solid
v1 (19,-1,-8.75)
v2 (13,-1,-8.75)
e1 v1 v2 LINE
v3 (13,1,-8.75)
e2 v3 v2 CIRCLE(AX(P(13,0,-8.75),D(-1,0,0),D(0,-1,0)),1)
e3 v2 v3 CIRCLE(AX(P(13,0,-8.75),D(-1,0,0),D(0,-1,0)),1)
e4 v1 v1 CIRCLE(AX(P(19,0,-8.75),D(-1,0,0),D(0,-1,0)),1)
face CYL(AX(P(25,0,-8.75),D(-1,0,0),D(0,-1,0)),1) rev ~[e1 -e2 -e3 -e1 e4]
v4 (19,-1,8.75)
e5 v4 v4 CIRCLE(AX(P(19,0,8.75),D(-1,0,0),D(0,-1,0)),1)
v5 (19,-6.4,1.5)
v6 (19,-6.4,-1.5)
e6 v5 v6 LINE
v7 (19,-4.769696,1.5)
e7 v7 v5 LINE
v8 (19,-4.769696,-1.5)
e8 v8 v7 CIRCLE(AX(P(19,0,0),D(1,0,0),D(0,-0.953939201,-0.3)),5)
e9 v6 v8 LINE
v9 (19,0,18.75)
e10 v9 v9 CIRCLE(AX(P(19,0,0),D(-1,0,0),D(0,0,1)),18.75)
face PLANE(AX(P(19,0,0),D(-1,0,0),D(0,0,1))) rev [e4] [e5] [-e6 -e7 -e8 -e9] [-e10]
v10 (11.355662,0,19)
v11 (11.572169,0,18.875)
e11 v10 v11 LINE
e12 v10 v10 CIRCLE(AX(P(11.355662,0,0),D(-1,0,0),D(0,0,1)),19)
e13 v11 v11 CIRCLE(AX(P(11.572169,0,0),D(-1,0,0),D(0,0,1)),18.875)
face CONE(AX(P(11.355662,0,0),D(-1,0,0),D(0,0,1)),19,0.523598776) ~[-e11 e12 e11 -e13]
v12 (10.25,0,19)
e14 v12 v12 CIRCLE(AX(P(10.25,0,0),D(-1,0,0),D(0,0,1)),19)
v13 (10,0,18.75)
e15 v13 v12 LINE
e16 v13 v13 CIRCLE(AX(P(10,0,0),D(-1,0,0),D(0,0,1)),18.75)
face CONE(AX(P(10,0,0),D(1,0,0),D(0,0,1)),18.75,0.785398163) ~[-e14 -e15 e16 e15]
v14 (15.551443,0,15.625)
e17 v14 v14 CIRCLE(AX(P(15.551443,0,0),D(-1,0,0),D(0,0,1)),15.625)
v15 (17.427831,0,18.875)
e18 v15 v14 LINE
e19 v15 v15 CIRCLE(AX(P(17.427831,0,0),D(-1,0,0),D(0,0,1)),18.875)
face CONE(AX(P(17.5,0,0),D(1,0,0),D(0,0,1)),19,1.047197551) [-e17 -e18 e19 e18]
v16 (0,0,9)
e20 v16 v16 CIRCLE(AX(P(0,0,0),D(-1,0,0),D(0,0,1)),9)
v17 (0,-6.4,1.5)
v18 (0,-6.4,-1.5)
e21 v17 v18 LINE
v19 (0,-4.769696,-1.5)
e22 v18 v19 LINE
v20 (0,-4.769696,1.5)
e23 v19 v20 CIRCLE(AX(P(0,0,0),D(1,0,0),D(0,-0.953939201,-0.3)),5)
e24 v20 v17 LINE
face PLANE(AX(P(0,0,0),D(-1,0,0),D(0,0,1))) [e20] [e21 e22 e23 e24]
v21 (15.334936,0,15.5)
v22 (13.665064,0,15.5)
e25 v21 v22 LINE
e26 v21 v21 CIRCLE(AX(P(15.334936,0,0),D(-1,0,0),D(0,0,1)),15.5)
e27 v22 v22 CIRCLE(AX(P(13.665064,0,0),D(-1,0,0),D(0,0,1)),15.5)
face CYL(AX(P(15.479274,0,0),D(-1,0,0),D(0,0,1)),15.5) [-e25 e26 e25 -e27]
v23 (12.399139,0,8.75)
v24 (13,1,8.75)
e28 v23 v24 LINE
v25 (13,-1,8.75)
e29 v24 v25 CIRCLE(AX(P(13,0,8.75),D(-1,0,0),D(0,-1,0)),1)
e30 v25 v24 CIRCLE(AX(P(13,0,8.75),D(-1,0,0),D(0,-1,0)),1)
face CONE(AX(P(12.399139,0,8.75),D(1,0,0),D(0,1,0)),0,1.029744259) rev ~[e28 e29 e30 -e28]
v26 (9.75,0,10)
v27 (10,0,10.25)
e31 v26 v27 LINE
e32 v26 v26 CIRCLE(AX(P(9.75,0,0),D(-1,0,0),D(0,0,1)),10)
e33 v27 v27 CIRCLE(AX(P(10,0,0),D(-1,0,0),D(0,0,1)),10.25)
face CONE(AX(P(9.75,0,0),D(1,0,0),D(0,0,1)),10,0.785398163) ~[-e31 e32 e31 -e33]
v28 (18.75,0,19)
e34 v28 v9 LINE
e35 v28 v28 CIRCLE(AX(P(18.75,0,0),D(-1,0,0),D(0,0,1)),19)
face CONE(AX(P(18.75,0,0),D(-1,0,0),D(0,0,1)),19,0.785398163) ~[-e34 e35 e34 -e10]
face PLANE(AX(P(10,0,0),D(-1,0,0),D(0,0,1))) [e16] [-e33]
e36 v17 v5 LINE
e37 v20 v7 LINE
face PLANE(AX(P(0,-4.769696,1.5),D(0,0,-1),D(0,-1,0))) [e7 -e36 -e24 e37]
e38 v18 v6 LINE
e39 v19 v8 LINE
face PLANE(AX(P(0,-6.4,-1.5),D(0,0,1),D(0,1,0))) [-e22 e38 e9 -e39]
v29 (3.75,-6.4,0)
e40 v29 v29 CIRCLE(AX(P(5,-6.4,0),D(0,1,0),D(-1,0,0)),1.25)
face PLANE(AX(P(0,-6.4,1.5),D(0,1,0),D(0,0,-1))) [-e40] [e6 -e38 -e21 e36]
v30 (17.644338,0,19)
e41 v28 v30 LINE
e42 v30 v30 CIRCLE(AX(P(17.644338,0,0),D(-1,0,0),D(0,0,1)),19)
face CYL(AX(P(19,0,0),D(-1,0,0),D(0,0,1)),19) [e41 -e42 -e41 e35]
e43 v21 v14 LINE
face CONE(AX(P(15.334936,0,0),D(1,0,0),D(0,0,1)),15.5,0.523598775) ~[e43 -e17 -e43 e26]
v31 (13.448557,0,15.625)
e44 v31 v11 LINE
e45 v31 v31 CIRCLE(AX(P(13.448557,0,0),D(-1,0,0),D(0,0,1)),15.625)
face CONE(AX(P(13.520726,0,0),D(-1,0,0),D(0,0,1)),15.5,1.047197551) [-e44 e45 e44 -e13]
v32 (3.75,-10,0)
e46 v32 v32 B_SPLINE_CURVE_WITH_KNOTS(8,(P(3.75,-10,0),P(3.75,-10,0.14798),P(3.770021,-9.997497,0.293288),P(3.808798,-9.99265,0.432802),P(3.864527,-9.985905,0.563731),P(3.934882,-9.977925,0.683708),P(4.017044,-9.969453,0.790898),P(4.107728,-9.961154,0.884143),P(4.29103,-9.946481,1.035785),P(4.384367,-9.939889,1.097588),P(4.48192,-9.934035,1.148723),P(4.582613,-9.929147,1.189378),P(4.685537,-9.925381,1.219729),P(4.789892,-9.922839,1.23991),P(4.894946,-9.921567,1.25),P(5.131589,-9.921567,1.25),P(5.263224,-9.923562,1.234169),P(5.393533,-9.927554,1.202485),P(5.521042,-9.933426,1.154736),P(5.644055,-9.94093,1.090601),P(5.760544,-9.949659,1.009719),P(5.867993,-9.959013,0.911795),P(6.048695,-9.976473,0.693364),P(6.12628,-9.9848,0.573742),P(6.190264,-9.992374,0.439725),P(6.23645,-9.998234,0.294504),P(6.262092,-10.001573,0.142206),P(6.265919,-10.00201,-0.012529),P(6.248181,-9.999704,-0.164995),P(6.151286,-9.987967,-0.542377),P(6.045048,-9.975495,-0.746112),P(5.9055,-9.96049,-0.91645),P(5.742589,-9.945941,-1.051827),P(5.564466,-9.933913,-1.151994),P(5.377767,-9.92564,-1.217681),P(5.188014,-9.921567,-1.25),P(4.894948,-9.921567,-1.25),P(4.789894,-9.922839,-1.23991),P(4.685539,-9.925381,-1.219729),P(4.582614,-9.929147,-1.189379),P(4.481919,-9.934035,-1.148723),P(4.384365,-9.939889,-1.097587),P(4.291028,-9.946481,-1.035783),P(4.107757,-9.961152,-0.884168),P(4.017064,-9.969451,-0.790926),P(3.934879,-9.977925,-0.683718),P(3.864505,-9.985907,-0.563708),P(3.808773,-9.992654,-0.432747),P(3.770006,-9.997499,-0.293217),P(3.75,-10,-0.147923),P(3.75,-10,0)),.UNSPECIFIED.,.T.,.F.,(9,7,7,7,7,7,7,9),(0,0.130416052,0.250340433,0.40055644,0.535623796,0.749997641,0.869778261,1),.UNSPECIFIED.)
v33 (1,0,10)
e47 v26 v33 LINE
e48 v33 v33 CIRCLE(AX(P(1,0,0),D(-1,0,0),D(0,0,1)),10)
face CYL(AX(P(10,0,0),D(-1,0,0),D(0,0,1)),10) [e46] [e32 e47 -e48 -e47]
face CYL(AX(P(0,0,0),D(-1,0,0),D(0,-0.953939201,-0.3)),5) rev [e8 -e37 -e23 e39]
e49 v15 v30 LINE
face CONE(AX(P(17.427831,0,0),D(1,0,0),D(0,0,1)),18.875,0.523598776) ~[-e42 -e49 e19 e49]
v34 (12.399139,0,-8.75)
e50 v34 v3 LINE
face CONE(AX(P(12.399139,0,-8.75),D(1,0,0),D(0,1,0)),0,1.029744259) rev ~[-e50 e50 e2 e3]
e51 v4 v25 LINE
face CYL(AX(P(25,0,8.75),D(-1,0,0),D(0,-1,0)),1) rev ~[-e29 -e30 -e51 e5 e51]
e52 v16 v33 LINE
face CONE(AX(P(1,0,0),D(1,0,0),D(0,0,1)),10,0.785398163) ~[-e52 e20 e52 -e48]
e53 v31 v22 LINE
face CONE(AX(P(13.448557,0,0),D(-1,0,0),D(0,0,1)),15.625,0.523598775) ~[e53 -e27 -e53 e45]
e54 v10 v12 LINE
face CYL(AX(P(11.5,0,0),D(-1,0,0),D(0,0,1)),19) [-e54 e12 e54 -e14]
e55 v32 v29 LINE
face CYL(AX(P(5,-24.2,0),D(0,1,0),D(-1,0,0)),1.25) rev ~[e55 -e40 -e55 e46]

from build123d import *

# Parameters (mm, degrees)
F3_SIZE   = 1
F6_DEPTH  = 19
F8_D      = 2.5
F8_DEPTH  = 14.2
F8_TIP    = 0.7510757738
F10_D     = 2
F10_DEPTH = 6
F10_TIP   = 0.600860619


# Not quite as in the source:
# - a fillet or chamfer that OpenCascade refuses, or shapes differently, is made with other operations: its cross-section is extruded or revolved along the edge and cut away or added


with BuildPart() as f2:
    # F0 (on Front) → F2 (revolve)
    with BuildSketch(Plane.XZ):
        Polygon((0, 10), (0, 0), (19, 0), (19, 19), (17.5, 19), (15.4792740578, 15.5), (13.5207259422, 15.5), (11.5, 19), (10, 19), (10, 10), align=None)
    revolve(axis=Axis((9.5, 0, 0), (-1, 0, 0)))

    # F3
    f3_edges = [f2.edges().sort_by_distance(p)[0] for p in [
        (0, 0, -10),
    ]]
    chamfer(f3_edges, length=F3_SIZE)

    # F4: chamfer of 0.25 on 10 edges, made by hand

    # F4_s1 → F4_t2 (revolve)
    with BuildSketch(Plane.XZ):
        Polygon((9.75, 10), (10, 10.25), (10, 10), align=None)
    revolve(axis=Axis((10, 0, 0), (-1, 0, 0)))

    # F4_s3 → F4_t4 (revolve)
    with BuildSketch(Plane.XZ):
        Polygon((15.3349364905, 15.5), (15.5514428415, 15.625), (15.4792740578, 15.5), align=None)
    revolve(axis=Axis((15.4792740578, 0, 0), (-1, 0, 0)))

    # F4_s5 → F4_t6 (revolve)
    with BuildSketch(Plane.XZ):
        Polygon((13.4485571585, 15.625), (13.6650635095, 15.5), (13.5207259422, 15.5), align=None)
    revolve(axis=Axis((13.5207259422, 0, 0), (-1, 0, 0)))

    # F4_s7 → F4_t8 (revolve, cut)
    with BuildSketch(Plane.XZ):
        Polygon((11.3556624327, 19), (11.5721687836, 18.875), (11.5, 19), align=None)
    revolve(axis=Axis((11.5, 0, 0), (-1, 0, 0)), mode=Mode.SUBTRACT)

    # F4_s9 → F4_t10 (revolve, cut)
    with BuildSketch(Plane.XZ):
        Polygon((10, 18.75), (10.25, 19), (10, 19), align=None)
    revolve(axis=Axis((10, 0, 0), (-1, 0, 0)), mode=Mode.SUBTRACT)

    # F4_s11 → F4_t12 (revolve, cut)
    with BuildSketch(Plane.XZ):
        Polygon((18.75, 19), (19, 18.75), (19, 19), align=None)
    revolve(axis=Axis((19, 0, 0), (-1, 0, 0)), mode=Mode.SUBTRACT)

    # F4_s13 → F4_t14 (revolve, cut)
    with BuildSketch(Plane.XZ):
        Polygon((17.4278312164, 18.875), (17.6443375673, 19), (17.5, 19), align=None)
    revolve(axis=Axis((17.5, 0, 0), (-1, 0, 0)), mode=Mode.SUBTRACT)

    # F5 (on Right) → F6 (cut, through all)
    with BuildSketch(Plane.YZ):
        with BuildLine():
            Line((-6.4, -1.5), (-4.7696960071, -1.5))
            ThreePointArc((-4.7696960071, -1.5), (5, 0), (-4.7696960071, 1.5))
            Line((-4.7696960071, 1.5), (-6.4, 1.5))
            Line((-6.4, 1.5), (-6.4, -1.5))
        make_face()
    extrude(amount=F6_DEPTH, mode=Mode.SUBTRACT)

    # F8
    with Locations(Plane.XZ.offset(10)):
        with Locations((5, 0)):
            Hole(F8_D / 2, depth=F8_DEPTH)
            with Locations((0, 0, -(F8_DEPTH + F8_TIP / 2))):  # 118° drill point
                Cone(0, F8_D / 2, F8_TIP, mode=Mode.SUBTRACT)

    # F10
    with Locations(Plane.YZ.offset(19)):
        with Locations((0, 8.75), (0, -8.75)):
            Hole(F10_D / 2, depth=F10_DEPTH)
            with Locations((0, 0, -(F10_DEPTH + F10_TIP / 2))):  # 118° drill point
                Cone(0, F10_D / 2, F10_TIP, mode=Mode.SUBTRACT)


solid = f2.part
